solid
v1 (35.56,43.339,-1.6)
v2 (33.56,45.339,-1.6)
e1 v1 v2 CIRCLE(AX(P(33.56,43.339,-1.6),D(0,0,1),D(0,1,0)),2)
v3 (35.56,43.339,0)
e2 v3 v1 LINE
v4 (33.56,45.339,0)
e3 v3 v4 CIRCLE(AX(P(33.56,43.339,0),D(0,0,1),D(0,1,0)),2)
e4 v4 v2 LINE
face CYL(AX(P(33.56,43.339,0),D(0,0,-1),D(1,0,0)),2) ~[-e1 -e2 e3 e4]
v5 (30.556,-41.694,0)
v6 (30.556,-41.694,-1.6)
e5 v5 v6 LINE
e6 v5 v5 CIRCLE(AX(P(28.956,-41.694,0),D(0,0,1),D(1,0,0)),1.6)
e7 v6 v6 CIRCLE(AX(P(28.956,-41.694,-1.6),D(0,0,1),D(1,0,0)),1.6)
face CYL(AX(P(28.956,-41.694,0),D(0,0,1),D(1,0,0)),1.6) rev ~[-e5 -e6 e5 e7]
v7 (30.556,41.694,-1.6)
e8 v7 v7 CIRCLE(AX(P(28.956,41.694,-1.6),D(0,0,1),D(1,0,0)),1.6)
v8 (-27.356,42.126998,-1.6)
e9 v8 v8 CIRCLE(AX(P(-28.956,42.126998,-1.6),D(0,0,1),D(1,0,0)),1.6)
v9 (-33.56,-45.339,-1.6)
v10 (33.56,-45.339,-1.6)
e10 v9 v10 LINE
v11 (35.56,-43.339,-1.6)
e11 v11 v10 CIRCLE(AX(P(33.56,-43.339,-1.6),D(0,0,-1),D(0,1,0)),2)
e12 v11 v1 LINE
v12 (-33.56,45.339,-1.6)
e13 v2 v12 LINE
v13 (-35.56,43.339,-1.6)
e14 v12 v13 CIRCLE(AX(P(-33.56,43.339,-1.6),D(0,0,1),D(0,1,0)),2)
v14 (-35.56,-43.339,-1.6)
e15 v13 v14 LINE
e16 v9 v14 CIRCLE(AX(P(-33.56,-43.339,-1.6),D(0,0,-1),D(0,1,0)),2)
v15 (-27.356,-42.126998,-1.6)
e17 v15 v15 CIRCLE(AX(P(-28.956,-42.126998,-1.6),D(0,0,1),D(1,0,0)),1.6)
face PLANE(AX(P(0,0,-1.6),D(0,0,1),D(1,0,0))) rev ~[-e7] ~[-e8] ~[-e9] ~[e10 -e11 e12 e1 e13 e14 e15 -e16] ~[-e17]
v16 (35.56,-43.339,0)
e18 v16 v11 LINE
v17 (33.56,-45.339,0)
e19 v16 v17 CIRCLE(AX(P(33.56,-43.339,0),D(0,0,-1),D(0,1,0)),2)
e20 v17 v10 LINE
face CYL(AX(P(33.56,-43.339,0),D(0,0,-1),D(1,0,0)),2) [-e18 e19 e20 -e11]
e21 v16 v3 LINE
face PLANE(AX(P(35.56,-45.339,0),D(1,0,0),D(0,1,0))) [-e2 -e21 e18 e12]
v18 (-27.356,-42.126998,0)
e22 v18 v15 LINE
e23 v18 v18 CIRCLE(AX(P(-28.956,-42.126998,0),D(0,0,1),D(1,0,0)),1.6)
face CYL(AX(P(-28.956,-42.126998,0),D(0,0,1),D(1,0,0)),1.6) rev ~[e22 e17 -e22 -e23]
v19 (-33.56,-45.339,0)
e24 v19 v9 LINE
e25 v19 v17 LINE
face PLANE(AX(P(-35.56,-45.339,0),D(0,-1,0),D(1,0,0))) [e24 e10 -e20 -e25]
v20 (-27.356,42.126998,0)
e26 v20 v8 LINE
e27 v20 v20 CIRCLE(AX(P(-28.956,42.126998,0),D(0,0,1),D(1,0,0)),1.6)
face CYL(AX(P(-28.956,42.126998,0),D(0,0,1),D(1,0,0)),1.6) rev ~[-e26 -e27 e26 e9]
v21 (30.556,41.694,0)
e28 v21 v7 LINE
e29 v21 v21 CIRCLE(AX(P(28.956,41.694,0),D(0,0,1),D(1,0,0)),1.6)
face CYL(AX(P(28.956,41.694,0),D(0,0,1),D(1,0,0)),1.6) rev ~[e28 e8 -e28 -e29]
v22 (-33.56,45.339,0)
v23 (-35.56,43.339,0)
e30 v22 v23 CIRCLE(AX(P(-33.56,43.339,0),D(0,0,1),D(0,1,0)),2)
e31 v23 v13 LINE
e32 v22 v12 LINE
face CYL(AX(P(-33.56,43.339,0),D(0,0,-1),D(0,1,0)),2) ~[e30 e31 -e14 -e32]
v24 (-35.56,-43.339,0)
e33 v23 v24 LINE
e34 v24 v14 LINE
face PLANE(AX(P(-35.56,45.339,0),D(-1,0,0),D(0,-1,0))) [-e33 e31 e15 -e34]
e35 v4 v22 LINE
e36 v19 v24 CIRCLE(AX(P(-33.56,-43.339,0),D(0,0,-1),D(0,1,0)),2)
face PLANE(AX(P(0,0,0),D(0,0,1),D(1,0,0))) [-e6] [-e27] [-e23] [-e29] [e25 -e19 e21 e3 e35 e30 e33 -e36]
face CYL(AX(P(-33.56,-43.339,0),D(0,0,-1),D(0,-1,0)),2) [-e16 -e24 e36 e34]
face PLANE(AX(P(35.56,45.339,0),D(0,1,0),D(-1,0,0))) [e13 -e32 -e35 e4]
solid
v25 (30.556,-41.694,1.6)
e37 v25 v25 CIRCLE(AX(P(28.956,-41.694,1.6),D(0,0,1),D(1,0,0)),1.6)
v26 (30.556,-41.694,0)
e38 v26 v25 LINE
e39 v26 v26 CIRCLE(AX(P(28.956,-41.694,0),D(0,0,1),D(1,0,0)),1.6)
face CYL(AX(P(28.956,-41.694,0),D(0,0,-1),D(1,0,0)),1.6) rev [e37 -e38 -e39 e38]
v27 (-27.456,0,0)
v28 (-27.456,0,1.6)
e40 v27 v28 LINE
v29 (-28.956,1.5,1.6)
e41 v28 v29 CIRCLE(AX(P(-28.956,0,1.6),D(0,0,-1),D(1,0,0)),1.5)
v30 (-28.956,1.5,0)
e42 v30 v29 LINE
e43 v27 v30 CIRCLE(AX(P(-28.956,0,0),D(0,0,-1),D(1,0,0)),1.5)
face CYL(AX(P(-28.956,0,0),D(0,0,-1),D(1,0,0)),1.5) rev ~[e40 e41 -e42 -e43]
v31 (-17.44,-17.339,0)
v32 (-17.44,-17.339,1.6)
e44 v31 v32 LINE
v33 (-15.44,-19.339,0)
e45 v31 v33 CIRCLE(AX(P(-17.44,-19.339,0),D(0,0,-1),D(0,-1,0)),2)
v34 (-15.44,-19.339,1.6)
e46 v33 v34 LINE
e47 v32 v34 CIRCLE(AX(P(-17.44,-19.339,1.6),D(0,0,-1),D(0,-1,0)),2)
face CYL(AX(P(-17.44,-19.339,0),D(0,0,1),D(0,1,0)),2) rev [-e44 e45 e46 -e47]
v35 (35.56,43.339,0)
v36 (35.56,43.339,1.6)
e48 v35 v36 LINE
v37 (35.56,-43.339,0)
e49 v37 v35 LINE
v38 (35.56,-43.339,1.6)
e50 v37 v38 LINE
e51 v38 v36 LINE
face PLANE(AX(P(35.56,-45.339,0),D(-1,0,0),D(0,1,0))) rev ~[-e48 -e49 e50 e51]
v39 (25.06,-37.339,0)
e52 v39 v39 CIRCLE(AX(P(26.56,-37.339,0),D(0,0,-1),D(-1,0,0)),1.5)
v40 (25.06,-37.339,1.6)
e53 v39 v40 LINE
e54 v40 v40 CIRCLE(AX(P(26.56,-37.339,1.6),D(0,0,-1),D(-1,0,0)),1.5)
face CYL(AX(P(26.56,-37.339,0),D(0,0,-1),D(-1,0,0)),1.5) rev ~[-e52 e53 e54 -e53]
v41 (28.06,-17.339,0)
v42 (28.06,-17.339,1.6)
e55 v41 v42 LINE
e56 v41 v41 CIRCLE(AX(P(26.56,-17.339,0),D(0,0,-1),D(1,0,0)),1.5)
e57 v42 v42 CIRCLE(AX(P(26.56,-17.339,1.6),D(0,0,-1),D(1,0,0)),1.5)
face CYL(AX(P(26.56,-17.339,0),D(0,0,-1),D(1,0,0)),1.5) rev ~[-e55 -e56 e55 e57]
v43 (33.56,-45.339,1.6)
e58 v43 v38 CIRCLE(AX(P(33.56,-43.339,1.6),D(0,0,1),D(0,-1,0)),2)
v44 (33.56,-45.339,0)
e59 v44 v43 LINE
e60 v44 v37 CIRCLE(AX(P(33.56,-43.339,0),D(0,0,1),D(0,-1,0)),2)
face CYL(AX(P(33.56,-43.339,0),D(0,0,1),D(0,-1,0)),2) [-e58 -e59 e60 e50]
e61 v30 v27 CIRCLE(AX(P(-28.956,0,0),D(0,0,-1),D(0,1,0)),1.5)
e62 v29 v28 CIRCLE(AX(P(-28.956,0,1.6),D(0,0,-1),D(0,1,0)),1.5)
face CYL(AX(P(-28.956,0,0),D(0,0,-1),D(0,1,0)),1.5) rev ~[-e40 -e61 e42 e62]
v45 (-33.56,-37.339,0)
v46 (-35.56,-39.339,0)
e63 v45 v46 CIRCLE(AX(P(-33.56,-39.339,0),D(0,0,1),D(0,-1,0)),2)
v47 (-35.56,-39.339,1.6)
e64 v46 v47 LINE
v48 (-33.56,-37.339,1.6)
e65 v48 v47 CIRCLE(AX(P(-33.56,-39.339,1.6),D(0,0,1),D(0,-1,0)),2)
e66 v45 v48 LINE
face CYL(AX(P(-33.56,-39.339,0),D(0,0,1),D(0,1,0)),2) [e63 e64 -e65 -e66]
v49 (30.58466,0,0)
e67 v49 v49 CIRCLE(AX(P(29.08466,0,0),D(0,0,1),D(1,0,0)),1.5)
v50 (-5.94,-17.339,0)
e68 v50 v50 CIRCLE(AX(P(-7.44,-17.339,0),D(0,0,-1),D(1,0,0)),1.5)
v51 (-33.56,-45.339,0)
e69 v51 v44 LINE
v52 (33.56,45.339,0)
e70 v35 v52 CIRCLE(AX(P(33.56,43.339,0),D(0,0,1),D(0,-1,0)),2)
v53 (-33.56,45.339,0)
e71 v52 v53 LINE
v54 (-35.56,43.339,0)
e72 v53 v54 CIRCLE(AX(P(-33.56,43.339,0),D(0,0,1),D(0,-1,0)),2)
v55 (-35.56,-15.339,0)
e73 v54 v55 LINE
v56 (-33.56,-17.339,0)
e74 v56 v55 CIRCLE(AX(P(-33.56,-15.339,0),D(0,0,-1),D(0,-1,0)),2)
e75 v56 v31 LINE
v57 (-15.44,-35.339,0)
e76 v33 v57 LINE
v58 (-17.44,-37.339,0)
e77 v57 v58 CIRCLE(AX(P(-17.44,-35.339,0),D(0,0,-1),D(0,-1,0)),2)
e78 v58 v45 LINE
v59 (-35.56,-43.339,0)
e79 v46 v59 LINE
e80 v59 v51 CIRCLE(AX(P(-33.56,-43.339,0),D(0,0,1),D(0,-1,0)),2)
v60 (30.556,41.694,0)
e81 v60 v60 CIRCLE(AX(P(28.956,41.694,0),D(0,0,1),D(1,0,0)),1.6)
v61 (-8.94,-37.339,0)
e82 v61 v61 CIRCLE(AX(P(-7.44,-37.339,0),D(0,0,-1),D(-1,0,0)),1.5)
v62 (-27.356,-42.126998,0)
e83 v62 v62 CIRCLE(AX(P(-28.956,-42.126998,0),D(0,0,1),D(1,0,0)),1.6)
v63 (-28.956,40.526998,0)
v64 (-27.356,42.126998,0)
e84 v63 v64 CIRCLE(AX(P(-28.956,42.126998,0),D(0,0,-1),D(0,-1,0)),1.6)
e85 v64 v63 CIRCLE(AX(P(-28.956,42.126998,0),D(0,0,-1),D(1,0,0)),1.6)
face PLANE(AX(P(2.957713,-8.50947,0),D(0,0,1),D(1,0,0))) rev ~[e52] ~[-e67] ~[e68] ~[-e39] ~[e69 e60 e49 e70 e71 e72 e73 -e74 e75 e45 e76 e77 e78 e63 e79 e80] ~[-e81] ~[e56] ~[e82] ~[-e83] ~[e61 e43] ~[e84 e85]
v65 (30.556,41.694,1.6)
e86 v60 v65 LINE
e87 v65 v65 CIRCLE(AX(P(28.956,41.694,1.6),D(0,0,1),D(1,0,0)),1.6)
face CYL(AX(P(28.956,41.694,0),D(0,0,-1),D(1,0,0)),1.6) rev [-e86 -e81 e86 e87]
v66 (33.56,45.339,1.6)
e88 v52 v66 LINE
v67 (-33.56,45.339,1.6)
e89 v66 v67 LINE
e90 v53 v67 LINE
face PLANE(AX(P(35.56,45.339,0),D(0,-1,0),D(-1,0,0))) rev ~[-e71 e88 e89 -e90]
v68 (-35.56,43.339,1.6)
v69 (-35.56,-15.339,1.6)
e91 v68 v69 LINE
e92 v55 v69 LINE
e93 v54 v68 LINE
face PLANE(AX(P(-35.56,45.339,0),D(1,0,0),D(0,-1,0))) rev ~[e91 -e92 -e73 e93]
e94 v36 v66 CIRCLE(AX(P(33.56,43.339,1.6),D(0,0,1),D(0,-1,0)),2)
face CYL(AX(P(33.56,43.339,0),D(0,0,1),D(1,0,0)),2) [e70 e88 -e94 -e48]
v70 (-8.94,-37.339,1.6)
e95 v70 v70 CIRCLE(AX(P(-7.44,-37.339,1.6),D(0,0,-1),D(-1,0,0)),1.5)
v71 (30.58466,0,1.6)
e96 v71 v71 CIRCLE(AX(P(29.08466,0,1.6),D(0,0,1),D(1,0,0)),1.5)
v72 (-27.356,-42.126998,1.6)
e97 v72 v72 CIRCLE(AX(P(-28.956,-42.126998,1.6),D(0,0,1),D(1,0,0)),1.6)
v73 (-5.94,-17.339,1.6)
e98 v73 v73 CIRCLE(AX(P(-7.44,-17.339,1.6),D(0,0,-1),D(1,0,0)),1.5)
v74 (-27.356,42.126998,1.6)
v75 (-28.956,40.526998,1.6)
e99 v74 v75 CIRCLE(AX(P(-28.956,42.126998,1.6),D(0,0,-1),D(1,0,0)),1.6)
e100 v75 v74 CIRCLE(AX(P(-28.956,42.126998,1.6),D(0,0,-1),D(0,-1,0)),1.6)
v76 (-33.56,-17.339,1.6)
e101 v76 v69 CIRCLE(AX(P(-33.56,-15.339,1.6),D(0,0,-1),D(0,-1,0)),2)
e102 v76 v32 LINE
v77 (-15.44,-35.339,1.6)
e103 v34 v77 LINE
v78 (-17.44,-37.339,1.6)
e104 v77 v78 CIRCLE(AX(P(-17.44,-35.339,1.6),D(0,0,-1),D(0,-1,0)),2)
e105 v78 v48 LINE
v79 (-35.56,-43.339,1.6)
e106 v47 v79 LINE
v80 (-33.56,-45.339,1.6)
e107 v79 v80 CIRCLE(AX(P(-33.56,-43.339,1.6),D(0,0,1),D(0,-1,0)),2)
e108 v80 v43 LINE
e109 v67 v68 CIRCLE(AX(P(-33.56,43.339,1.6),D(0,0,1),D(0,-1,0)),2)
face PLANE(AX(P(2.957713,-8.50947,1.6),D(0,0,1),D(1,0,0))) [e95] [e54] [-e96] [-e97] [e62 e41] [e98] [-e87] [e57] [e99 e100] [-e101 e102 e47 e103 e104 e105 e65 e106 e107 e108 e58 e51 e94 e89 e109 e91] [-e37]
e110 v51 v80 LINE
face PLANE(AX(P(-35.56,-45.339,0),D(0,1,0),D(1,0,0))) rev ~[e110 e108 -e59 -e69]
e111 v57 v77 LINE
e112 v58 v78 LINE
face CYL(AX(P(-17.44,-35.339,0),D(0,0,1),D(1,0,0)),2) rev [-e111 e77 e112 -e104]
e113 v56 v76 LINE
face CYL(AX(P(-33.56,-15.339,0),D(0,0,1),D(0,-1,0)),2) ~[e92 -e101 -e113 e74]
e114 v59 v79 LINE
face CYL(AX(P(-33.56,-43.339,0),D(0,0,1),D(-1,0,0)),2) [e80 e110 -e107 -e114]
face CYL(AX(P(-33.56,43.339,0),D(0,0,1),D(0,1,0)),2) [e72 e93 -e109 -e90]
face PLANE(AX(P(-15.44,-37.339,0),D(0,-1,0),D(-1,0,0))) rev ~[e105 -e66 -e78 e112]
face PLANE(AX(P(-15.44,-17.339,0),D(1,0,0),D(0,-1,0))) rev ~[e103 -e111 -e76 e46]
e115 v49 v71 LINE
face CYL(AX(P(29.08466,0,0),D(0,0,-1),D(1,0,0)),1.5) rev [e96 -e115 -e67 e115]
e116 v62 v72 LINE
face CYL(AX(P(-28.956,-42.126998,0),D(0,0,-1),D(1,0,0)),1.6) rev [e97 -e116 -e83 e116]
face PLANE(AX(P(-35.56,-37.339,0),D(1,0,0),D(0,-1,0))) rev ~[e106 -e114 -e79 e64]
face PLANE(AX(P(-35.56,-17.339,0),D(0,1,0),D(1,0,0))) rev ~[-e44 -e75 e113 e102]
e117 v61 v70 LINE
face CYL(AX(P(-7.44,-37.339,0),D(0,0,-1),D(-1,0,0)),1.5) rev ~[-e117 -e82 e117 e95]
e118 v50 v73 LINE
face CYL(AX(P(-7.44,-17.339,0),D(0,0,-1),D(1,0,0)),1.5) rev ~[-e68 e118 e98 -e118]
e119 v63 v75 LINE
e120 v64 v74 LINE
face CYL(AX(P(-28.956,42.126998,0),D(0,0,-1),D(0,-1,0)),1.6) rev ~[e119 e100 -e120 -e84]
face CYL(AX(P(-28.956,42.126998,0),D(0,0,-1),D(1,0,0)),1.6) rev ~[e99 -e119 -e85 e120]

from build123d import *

# Parameters (mm, degrees)
F0_R     = 1.6
F1_DEPTH = 1.6
F2_R     = 2
F3_R     = 1.6
F3_R_2   = 1.5
F4_DEPTH = 1.6
F5_R     = 2


# Not quite as in the source:
# - a feature names something its author has since deleted; it is built from what else it names


with BuildPart() as f1:
    # F0 (on Top) → F1 (new body)
    with BuildSketch(Plane.XY):
        Polygon((22.86, -45.339), (35.56, -45.339), (35.56, 45.339), (22.86, 45.339), (-22.86, 45.339), (-35.56, 45.339), (-35.56, -45.339), (-22.86, -45.339), align=None)
        with Locations((-28.956, -42.126997942)):
            Circle(F0_R, mode=Mode.SUBTRACT)
        with Locations((28.956, -41.694)):
            Circle(F0_R, mode=Mode.SUBTRACT)
        with Locations((-28.956, 42.126997942)):
            Circle(F0_R, mode=Mode.SUBTRACT)
        with Locations((28.956, 41.694)):
            Circle(F0_R, mode=Mode.SUBTRACT)
    extrude(amount=-F1_DEPTH)

    # F2
    f2_edges = [f1.edges().sort_by_distance(p)[0] for p in [
        (-35.56, 45.339, -0.8),
        (35.56, 45.339, -0.8),
        (-35.56, -45.339, -0.8),
        (35.56, -45.339, -0.8),
    ]]
    fillet(f2_edges, radius=F2_R)


with BuildPart() as f4:
    # F3 (on face) → F4 (new body)
    with BuildSketch(Plane.XY):
        with BuildLine():
            Line((-35.56, -17.339), (-19.8256308937, -17.339))
            Line((-19.8256308937, -17.339), (-15.44, -17.339))
            Line((-15.44, -17.339), (-8.94, -17.339))
            ThreePointArc((-8.94, -17.339), (-7.44, -15.839), (-5.94, -17.339))
            Line((-5.94, -17.339), (25.06, -17.339))
            ThreePointArc((25.06, -17.339), (26.56, -15.839), (28.06, -17.339))
            Line((28.06, -17.339), (34.56, -17.339))
            Line((34.56, -17.339), (34.56, -37.339))
            Line((34.56, -37.339), (28.06, -37.339))
            ThreePointArc((28.06, -37.339), (26.56, -38.839), (25.06, -37.339))
            Line((25.06, -37.339), (-5.94, -37.339))
            ThreePointArc((-5.94, -37.339), (-7.44, -38.839), (-8.94, -37.339))
            Line((-8.94, -37.339), (-15.44, -37.339))
            Line((-15.44, -37.339), (-35.56, -37.339))
            Line((-35.56, -37.339), (-35.56, -45.339))
            Line((-35.56, -45.339), (-22.86, -45.339))
            Line((-22.86, -45.339), (22.86, -45.339))
            Line((22.86, -45.339), (35.56, -45.339))
            Line((35.56, -45.339), (35.56, 45.339))
            Line((35.56, 45.339), (22.86, 45.339))
            Line((22.86, 45.339), (-22.86, 45.339))
            Line((-22.86, 45.339), (-35.56, 45.339))
            Line((-35.56, 45.339), (-35.56, -17.339))
        make_face()
        with Locations((-28.956, -42.126997942)):
            Circle(F3_R, mode=Mode.SUBTRACT)
        with BuildLine():
            ThreePointArc((-27.456, 0), (-30.0166601718, -1.0606601718), (-28.956, 1.5))
            ThreePointArc((-28.956, 1.5), (-27.8953398282, 1.0606601718), (-27.456, 0))
        make_face(mode=Mode.SUBTRACT)
        with Locations((28.956, -41.694)):
            Circle(F3_R, mode=Mode.SUBTRACT)
        with Locations((29.0846601129, 0)):
            Circle(F3_R_2, mode=Mode.SUBTRACT)
        with BuildLine():
            ThreePointArc((-27.356, 42.126997942), (-27.8246291501, 40.9956270921), (-28.956, 40.526997942))
            ThreePointArc((-28.956, 40.526997942), (-30.0873708499, 43.2583687919), (-27.356, 42.126997942))
        make_face(mode=Mode.SUBTRACT)
        with BuildLine():
            ThreePointArc((27.4999902592, 17.0231461525), (27.4999975648, 17.0115730773), (27.5, 17))
            ThreePointArc((27.5, 17), (13.75, -6.8156986041), (-13.75, -6.8156986041))
            ThreePointArc((-13.75, -6.8156986041), (-23.8214830338, 3.2600237965), (-27.4999902592, 17.0231461525))
            ThreePointArc((-27.4999902592, 17.0231461525), (0, 44.5), (27.4999902592, 17.0231461525))
        make_face(mode=Mode.SUBTRACT)
        with Locations((28.956, 41.694)):
            Circle(F3_R, mode=Mode.SUBTRACT)
        with BuildLine():
            ThreePointArc((-13.75, -6.8156986041), (13.75, -6.8156986041), (27.5, 17))
            ThreePointArc((27.5, 17), (27.4999975648, 17.0115730773), (27.4999902592, 17.0231461525))
            Line((27.4999902592, 17.0231461525), (-27.4999902592, 17.0231461525))
            ThreePointArc((-27.4999902592, 17.0231461525), (-23.8214830338, 3.2600237965), (-13.75, -6.8156986041))
        make_face()
        with BuildLine():
            Line((-27.4999902592, 17.0231461525), (27.4999902592, 17.0231461525))
            ThreePointArc((27.4999902592, 17.0231461525), (0, 44.5), (-27.4999902592, 17.0231461525))
        make_face()
        with BuildLine():
            Line((-8.94, -17.339), (-15.44, -17.339))
            Line((-15.44, -17.339), (-15.44, -37.339))
            Line((-15.44, -37.339), (-8.94, -37.339))
            ThreePointArc((-8.94, -37.339), (-7.44, -35.839), (-5.94, -37.339))
            Line((-5.94, -37.339), (25.06, -37.339))
            ThreePointArc((25.06, -37.339), (26.56, -35.839), (28.06, -37.339))
            Line((28.06, -37.339), (34.56, -37.339))
            Line((34.56, -37.339), (34.56, -17.339))
            Line((34.56, -17.339), (28.06, -17.339))
            ThreePointArc((28.06, -17.339), (26.56, -18.839), (25.06, -17.339))
            Line((25.06, -17.339), (-5.94, -17.339))
            ThreePointArc((-5.94, -17.339), (-7.44, -18.839), (-8.94, -17.339))
        make_face()
    extrude(amount=F4_DEPTH)

    # F5
    f5_edges = [f4.edges().sort_by_distance(p)[0] for p in [
        (-15.44, -17.339, 0.8),
        (-35.56, -17.339, 0.8),
        (-35.56, -37.339, 0.8),
        (-15.44, -37.339, 0.8),
        (-35.56, -45.339, 0.8),
        (35.56, 45.339, 0.8),
        (-35.56, 45.339, 0.8),
        (35.56, -45.339, 0.8),
    ]]
    fillet(f5_edges, radius=F5_R)


solid = Compound([f1.part, f4.part])
